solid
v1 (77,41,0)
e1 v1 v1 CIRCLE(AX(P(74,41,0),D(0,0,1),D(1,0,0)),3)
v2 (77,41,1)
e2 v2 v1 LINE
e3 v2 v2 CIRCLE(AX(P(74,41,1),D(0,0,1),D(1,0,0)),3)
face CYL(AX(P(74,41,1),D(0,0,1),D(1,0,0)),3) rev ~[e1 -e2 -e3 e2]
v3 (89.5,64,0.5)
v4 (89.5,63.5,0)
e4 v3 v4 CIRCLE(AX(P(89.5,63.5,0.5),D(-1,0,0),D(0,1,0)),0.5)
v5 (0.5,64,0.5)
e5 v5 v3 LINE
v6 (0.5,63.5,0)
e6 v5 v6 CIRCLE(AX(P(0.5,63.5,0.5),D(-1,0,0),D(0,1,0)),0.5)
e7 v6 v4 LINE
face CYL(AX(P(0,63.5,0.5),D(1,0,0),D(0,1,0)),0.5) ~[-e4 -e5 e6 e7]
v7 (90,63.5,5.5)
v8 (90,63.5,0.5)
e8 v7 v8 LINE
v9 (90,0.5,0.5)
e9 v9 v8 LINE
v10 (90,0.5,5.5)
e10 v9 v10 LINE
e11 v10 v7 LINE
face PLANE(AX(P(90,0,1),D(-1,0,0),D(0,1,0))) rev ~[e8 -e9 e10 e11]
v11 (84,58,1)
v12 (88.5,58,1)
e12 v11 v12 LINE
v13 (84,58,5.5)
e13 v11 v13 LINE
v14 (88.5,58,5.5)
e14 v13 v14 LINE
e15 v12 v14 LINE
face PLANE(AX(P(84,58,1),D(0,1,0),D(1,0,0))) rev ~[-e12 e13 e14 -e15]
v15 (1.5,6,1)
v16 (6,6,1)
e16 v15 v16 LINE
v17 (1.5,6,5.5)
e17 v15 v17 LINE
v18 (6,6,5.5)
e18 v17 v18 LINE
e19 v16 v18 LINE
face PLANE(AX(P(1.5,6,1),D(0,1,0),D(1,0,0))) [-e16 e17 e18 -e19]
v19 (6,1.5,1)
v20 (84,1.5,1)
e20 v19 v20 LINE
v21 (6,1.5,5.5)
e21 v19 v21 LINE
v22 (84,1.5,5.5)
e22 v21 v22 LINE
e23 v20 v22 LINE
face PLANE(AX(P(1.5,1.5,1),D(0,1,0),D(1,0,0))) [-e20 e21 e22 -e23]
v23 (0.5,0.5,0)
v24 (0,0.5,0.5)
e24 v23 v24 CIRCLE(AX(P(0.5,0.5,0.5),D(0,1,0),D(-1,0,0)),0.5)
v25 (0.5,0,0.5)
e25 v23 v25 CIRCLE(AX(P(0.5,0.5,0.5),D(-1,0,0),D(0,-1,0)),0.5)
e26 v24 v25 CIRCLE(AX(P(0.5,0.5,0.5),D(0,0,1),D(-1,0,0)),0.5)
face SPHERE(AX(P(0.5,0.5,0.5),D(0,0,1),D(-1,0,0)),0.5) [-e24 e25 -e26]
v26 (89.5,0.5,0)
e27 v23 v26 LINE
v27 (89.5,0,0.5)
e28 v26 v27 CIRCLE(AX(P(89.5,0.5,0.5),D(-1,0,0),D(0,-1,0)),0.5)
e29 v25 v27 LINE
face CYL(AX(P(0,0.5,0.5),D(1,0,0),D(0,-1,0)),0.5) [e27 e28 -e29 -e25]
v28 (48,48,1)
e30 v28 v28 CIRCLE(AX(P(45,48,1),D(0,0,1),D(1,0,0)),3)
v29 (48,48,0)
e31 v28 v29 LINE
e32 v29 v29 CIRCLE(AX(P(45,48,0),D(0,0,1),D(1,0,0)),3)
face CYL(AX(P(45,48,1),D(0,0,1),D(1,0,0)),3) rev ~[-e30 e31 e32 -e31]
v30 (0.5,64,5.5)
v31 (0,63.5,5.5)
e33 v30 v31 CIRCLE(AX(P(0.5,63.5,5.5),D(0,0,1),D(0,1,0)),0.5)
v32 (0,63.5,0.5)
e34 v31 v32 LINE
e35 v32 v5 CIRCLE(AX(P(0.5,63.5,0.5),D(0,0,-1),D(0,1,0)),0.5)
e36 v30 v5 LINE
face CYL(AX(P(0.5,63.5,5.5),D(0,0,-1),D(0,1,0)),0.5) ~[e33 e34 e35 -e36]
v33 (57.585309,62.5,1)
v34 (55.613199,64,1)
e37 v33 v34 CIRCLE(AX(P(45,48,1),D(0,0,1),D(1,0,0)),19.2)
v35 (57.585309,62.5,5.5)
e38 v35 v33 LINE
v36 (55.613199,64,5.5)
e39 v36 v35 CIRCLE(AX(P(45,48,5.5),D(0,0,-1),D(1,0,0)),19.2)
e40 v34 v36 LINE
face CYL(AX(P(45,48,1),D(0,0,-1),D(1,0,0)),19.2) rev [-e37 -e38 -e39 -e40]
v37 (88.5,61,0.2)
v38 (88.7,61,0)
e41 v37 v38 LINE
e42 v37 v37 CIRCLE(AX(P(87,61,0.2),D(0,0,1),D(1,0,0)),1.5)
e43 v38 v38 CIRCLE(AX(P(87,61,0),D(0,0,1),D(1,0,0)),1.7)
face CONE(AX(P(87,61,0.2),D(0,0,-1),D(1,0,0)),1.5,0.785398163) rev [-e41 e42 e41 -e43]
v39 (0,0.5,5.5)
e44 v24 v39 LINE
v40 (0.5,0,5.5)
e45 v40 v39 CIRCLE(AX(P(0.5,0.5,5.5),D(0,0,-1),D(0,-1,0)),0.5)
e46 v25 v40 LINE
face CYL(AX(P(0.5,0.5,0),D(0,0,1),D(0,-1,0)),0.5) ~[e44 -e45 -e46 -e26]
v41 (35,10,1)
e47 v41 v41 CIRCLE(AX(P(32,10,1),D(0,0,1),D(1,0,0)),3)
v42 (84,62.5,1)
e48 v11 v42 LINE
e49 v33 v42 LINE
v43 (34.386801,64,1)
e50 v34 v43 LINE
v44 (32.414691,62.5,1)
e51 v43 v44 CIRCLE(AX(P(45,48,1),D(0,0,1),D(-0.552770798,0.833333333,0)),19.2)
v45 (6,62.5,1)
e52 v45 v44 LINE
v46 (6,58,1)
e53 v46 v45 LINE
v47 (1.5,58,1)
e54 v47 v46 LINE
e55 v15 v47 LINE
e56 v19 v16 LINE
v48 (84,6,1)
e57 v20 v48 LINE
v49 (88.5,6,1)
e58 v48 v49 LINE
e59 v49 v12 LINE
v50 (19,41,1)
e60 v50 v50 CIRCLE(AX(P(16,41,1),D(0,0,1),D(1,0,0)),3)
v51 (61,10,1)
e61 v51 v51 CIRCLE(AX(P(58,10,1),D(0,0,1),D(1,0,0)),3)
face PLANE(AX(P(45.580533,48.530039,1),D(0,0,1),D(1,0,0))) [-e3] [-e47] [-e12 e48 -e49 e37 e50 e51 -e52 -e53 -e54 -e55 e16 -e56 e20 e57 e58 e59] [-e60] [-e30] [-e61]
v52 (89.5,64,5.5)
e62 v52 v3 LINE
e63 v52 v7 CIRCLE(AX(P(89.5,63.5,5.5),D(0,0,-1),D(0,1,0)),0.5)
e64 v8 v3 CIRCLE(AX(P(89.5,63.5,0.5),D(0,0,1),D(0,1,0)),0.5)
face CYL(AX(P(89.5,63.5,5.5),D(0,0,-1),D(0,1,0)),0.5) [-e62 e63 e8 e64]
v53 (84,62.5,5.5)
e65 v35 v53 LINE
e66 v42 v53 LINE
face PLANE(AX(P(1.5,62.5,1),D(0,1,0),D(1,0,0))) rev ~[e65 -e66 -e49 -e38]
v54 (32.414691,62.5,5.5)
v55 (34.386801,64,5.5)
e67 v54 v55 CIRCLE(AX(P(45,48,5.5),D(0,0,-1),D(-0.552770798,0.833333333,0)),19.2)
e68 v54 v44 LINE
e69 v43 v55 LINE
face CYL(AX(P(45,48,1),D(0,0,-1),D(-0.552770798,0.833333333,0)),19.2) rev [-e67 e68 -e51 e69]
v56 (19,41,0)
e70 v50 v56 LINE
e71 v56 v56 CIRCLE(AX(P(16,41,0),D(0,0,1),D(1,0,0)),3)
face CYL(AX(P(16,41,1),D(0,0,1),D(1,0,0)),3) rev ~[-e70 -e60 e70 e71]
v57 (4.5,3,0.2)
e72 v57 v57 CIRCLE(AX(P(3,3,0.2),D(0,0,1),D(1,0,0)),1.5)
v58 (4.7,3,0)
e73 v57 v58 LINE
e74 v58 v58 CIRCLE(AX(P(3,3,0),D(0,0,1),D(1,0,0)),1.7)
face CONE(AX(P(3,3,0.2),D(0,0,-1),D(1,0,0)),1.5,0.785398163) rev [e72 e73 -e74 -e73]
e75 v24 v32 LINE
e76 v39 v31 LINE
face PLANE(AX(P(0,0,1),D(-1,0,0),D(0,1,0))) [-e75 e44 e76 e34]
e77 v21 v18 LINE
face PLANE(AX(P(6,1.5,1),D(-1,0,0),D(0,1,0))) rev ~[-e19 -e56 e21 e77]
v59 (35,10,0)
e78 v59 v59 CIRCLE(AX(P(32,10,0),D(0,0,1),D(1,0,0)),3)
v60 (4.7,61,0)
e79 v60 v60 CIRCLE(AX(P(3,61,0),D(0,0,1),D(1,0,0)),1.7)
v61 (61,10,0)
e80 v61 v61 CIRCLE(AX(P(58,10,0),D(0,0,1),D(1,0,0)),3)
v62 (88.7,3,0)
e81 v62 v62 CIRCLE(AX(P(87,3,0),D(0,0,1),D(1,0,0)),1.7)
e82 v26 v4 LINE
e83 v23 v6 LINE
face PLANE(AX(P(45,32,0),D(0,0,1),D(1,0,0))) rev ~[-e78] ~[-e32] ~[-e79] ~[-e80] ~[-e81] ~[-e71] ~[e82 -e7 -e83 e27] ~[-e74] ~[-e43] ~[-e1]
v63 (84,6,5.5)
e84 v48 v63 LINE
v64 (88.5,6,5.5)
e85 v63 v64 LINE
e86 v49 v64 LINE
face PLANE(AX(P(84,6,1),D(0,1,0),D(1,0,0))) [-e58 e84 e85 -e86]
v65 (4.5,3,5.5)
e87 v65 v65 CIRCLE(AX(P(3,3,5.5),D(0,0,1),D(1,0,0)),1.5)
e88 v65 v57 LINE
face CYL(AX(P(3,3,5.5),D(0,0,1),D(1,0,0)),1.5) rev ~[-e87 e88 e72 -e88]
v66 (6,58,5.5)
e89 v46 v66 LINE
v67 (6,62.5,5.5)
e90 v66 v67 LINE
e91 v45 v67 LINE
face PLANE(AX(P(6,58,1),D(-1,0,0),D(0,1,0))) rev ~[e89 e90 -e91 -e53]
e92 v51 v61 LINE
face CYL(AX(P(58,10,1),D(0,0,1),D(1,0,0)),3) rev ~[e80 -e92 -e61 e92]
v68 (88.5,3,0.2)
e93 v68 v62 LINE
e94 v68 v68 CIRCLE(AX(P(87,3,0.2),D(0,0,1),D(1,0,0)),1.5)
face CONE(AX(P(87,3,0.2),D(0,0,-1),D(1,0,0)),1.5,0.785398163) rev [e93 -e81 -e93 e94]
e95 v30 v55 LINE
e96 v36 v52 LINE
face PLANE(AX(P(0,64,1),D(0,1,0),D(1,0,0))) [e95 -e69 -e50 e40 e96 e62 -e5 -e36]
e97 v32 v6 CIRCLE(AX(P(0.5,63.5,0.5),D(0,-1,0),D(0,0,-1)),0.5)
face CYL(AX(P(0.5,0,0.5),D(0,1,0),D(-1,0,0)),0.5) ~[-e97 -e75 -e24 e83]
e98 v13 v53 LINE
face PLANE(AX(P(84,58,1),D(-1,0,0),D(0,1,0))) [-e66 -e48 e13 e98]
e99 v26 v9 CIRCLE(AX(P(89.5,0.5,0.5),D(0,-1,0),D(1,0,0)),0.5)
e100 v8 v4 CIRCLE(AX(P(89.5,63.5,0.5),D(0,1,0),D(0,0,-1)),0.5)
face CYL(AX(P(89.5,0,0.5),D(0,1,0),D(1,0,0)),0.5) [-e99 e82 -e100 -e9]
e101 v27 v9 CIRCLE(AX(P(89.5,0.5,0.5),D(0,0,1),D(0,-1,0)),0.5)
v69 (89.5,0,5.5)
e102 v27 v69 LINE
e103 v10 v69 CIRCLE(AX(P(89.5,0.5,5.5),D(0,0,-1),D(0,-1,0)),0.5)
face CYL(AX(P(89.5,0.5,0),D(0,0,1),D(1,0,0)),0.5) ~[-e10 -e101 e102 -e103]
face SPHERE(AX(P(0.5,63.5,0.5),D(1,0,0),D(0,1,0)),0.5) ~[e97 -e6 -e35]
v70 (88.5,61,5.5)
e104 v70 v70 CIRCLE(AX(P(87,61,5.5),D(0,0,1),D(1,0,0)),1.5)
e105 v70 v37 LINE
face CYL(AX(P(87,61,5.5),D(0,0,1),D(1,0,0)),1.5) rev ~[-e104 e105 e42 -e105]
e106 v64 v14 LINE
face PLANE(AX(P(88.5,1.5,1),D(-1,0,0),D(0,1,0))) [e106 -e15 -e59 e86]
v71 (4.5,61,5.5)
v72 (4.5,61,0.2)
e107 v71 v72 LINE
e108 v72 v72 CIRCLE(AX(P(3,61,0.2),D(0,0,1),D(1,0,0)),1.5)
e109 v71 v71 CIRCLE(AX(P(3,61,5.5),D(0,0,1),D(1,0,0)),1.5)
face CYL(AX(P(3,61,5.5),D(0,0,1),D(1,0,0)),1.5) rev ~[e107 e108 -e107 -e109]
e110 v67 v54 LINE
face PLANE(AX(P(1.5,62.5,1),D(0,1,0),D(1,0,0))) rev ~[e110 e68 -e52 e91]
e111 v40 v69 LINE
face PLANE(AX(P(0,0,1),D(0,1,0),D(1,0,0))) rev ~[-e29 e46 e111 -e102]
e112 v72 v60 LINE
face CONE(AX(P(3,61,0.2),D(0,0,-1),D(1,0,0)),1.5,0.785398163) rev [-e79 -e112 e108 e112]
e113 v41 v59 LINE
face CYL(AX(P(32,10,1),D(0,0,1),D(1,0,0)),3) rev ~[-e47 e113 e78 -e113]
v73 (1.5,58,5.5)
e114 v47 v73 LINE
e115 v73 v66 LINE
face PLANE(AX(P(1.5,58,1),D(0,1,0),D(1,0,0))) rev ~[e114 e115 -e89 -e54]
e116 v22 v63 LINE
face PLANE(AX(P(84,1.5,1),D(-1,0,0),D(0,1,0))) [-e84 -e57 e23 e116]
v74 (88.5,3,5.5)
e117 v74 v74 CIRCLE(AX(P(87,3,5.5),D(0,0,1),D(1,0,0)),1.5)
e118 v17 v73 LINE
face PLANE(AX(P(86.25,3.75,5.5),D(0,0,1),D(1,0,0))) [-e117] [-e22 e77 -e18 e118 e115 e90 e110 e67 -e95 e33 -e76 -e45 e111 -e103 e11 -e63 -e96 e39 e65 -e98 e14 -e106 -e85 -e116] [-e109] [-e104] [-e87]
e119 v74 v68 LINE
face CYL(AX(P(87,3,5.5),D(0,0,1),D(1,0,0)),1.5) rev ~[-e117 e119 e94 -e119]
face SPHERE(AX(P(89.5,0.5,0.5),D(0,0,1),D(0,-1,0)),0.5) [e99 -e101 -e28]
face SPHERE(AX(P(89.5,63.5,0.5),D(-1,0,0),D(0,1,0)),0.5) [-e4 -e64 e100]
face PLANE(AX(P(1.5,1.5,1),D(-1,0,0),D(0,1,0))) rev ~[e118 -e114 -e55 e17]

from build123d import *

# Parameters (mm, degrees)
F0_W      = 90
F0_H      = 64
F1_DEPTH  = 1
F3_W      = 90
F3_H      = 64
F3_W_2    = 87
F3_H_2    = 61
F4_DEPTH  = 4.5
F5_R      = 3
F6_DEPTH  = 1.001
F8_DEPTH  = 4.501
F10_W     = 4.5
F10_H     = 4.5
F11_DEPTH = 4.5
F12_R     = 1.5
F13_DEPTH = 5.501
F14_R     = 0.5
F16_SIZE  = 0.2


# Not quite as in the source:
# - two fillets or chamfers of one size are made in one step


with BuildPart() as f1:
    # F0 (on Top) → F1 (new body)
    with BuildSketch(Plane.XY):
        with Locations((45, 32)):
            Rectangle(F0_W, F0_H)
    extrude(amount=F1_DEPTH)

    # F3 (on face) → F4 (join)
    with BuildSketch(Plane.XY.offset(1)):
        with Locations((45, 32)):
            Rectangle(F3_W, F3_H)
        with Locations((45, 32)):
            Rectangle(F3_W_2, F3_H_2, mode=Mode.SUBTRACT)
    extrude(amount=F4_DEPTH)

    # F5 (on face) → F6 (cut, through all)
    with BuildSketch(Plane.XY.offset(1)):
        with Locations((16, 41)):
            Circle(F5_R)
        with Locations((45, 48)):
            Circle(F5_R)
        with Locations((32, 10)):
            Circle(F5_R)
        with Locations((58, 10)):
            Circle(F5_R)
        with Locations((74, 41)):
            Circle(F5_R)
    extrude(amount=-F6_DEPTH, mode=Mode.SUBTRACT)

    # F7 (on face) → F8 (cut, through all)
    with BuildSketch(Plane.XY.offset(1)):
        with BuildLine():
            ThreePointArc((34.3868006709, 64), (35.920722141, 31.0823549641), (64.2, 48))
            ThreePointArc((64.2, 48), (61.9176450359, 57.079277859), (55.6131993291, 64))
            Line((55.6131993291, 64), (34.3868006709, 64))
        make_face()
    extrude(amount=F8_DEPTH, mode=Mode.SUBTRACT)

    # F10 (on face) → F11 (join, through all)
    with BuildSketch(Plane.XY.offset(1)):
        with Locations((86.25, 3.75)):
            Rectangle(F10_W, F10_H)
        with Locations((86.25, 60.25)):
            Rectangle(F10_W, F10_H)
        with Locations((3.75, 3.75)):
            Rectangle(F10_W, F10_H)
        with Locations((3.75, 60.25)):
            Rectangle(F10_W, F10_H)
    extrude(amount=F11_DEPTH)

    # F12 (on face) → F13 (cut, through all)
    with BuildSketch(Plane.XY.offset(5.5)):
        with Locations((87, 3)):
            Circle(F12_R)
        with Locations((3, 3)):
            Circle(F12_R)
        with Locations((87, 61)):
            Circle(F12_R)
        with Locations((3, 61)):
            Circle(F12_R)
    extrude(amount=-F13_DEPTH, mode=Mode.SUBTRACT)

    # F14
    f14_edges = [f1.edges().sort_by_distance(p)[0] for p in [
        (45, 64, 0),
        (0, 64, 2.75),
        (0, 0, 2.75),
        (0, 32, 0),
        (90, 64, 2.75),
        (90, 0, 2.75),
        (45, 0, 0),
        (90, 32, 0),
    ]]
    fillet(f14_edges, radius=F14_R)

    # F16
    f16_edges = [f1.edges().sort_by_distance(p)[0] for p in [
        (85.5, 61, 0),
        (85.5, 3, 0),
        (1.5, 3, 0),
        (1.5, 61, 0),
    ]]
    chamfer(f16_edges, length=F16_SIZE)


solid = f1.part
